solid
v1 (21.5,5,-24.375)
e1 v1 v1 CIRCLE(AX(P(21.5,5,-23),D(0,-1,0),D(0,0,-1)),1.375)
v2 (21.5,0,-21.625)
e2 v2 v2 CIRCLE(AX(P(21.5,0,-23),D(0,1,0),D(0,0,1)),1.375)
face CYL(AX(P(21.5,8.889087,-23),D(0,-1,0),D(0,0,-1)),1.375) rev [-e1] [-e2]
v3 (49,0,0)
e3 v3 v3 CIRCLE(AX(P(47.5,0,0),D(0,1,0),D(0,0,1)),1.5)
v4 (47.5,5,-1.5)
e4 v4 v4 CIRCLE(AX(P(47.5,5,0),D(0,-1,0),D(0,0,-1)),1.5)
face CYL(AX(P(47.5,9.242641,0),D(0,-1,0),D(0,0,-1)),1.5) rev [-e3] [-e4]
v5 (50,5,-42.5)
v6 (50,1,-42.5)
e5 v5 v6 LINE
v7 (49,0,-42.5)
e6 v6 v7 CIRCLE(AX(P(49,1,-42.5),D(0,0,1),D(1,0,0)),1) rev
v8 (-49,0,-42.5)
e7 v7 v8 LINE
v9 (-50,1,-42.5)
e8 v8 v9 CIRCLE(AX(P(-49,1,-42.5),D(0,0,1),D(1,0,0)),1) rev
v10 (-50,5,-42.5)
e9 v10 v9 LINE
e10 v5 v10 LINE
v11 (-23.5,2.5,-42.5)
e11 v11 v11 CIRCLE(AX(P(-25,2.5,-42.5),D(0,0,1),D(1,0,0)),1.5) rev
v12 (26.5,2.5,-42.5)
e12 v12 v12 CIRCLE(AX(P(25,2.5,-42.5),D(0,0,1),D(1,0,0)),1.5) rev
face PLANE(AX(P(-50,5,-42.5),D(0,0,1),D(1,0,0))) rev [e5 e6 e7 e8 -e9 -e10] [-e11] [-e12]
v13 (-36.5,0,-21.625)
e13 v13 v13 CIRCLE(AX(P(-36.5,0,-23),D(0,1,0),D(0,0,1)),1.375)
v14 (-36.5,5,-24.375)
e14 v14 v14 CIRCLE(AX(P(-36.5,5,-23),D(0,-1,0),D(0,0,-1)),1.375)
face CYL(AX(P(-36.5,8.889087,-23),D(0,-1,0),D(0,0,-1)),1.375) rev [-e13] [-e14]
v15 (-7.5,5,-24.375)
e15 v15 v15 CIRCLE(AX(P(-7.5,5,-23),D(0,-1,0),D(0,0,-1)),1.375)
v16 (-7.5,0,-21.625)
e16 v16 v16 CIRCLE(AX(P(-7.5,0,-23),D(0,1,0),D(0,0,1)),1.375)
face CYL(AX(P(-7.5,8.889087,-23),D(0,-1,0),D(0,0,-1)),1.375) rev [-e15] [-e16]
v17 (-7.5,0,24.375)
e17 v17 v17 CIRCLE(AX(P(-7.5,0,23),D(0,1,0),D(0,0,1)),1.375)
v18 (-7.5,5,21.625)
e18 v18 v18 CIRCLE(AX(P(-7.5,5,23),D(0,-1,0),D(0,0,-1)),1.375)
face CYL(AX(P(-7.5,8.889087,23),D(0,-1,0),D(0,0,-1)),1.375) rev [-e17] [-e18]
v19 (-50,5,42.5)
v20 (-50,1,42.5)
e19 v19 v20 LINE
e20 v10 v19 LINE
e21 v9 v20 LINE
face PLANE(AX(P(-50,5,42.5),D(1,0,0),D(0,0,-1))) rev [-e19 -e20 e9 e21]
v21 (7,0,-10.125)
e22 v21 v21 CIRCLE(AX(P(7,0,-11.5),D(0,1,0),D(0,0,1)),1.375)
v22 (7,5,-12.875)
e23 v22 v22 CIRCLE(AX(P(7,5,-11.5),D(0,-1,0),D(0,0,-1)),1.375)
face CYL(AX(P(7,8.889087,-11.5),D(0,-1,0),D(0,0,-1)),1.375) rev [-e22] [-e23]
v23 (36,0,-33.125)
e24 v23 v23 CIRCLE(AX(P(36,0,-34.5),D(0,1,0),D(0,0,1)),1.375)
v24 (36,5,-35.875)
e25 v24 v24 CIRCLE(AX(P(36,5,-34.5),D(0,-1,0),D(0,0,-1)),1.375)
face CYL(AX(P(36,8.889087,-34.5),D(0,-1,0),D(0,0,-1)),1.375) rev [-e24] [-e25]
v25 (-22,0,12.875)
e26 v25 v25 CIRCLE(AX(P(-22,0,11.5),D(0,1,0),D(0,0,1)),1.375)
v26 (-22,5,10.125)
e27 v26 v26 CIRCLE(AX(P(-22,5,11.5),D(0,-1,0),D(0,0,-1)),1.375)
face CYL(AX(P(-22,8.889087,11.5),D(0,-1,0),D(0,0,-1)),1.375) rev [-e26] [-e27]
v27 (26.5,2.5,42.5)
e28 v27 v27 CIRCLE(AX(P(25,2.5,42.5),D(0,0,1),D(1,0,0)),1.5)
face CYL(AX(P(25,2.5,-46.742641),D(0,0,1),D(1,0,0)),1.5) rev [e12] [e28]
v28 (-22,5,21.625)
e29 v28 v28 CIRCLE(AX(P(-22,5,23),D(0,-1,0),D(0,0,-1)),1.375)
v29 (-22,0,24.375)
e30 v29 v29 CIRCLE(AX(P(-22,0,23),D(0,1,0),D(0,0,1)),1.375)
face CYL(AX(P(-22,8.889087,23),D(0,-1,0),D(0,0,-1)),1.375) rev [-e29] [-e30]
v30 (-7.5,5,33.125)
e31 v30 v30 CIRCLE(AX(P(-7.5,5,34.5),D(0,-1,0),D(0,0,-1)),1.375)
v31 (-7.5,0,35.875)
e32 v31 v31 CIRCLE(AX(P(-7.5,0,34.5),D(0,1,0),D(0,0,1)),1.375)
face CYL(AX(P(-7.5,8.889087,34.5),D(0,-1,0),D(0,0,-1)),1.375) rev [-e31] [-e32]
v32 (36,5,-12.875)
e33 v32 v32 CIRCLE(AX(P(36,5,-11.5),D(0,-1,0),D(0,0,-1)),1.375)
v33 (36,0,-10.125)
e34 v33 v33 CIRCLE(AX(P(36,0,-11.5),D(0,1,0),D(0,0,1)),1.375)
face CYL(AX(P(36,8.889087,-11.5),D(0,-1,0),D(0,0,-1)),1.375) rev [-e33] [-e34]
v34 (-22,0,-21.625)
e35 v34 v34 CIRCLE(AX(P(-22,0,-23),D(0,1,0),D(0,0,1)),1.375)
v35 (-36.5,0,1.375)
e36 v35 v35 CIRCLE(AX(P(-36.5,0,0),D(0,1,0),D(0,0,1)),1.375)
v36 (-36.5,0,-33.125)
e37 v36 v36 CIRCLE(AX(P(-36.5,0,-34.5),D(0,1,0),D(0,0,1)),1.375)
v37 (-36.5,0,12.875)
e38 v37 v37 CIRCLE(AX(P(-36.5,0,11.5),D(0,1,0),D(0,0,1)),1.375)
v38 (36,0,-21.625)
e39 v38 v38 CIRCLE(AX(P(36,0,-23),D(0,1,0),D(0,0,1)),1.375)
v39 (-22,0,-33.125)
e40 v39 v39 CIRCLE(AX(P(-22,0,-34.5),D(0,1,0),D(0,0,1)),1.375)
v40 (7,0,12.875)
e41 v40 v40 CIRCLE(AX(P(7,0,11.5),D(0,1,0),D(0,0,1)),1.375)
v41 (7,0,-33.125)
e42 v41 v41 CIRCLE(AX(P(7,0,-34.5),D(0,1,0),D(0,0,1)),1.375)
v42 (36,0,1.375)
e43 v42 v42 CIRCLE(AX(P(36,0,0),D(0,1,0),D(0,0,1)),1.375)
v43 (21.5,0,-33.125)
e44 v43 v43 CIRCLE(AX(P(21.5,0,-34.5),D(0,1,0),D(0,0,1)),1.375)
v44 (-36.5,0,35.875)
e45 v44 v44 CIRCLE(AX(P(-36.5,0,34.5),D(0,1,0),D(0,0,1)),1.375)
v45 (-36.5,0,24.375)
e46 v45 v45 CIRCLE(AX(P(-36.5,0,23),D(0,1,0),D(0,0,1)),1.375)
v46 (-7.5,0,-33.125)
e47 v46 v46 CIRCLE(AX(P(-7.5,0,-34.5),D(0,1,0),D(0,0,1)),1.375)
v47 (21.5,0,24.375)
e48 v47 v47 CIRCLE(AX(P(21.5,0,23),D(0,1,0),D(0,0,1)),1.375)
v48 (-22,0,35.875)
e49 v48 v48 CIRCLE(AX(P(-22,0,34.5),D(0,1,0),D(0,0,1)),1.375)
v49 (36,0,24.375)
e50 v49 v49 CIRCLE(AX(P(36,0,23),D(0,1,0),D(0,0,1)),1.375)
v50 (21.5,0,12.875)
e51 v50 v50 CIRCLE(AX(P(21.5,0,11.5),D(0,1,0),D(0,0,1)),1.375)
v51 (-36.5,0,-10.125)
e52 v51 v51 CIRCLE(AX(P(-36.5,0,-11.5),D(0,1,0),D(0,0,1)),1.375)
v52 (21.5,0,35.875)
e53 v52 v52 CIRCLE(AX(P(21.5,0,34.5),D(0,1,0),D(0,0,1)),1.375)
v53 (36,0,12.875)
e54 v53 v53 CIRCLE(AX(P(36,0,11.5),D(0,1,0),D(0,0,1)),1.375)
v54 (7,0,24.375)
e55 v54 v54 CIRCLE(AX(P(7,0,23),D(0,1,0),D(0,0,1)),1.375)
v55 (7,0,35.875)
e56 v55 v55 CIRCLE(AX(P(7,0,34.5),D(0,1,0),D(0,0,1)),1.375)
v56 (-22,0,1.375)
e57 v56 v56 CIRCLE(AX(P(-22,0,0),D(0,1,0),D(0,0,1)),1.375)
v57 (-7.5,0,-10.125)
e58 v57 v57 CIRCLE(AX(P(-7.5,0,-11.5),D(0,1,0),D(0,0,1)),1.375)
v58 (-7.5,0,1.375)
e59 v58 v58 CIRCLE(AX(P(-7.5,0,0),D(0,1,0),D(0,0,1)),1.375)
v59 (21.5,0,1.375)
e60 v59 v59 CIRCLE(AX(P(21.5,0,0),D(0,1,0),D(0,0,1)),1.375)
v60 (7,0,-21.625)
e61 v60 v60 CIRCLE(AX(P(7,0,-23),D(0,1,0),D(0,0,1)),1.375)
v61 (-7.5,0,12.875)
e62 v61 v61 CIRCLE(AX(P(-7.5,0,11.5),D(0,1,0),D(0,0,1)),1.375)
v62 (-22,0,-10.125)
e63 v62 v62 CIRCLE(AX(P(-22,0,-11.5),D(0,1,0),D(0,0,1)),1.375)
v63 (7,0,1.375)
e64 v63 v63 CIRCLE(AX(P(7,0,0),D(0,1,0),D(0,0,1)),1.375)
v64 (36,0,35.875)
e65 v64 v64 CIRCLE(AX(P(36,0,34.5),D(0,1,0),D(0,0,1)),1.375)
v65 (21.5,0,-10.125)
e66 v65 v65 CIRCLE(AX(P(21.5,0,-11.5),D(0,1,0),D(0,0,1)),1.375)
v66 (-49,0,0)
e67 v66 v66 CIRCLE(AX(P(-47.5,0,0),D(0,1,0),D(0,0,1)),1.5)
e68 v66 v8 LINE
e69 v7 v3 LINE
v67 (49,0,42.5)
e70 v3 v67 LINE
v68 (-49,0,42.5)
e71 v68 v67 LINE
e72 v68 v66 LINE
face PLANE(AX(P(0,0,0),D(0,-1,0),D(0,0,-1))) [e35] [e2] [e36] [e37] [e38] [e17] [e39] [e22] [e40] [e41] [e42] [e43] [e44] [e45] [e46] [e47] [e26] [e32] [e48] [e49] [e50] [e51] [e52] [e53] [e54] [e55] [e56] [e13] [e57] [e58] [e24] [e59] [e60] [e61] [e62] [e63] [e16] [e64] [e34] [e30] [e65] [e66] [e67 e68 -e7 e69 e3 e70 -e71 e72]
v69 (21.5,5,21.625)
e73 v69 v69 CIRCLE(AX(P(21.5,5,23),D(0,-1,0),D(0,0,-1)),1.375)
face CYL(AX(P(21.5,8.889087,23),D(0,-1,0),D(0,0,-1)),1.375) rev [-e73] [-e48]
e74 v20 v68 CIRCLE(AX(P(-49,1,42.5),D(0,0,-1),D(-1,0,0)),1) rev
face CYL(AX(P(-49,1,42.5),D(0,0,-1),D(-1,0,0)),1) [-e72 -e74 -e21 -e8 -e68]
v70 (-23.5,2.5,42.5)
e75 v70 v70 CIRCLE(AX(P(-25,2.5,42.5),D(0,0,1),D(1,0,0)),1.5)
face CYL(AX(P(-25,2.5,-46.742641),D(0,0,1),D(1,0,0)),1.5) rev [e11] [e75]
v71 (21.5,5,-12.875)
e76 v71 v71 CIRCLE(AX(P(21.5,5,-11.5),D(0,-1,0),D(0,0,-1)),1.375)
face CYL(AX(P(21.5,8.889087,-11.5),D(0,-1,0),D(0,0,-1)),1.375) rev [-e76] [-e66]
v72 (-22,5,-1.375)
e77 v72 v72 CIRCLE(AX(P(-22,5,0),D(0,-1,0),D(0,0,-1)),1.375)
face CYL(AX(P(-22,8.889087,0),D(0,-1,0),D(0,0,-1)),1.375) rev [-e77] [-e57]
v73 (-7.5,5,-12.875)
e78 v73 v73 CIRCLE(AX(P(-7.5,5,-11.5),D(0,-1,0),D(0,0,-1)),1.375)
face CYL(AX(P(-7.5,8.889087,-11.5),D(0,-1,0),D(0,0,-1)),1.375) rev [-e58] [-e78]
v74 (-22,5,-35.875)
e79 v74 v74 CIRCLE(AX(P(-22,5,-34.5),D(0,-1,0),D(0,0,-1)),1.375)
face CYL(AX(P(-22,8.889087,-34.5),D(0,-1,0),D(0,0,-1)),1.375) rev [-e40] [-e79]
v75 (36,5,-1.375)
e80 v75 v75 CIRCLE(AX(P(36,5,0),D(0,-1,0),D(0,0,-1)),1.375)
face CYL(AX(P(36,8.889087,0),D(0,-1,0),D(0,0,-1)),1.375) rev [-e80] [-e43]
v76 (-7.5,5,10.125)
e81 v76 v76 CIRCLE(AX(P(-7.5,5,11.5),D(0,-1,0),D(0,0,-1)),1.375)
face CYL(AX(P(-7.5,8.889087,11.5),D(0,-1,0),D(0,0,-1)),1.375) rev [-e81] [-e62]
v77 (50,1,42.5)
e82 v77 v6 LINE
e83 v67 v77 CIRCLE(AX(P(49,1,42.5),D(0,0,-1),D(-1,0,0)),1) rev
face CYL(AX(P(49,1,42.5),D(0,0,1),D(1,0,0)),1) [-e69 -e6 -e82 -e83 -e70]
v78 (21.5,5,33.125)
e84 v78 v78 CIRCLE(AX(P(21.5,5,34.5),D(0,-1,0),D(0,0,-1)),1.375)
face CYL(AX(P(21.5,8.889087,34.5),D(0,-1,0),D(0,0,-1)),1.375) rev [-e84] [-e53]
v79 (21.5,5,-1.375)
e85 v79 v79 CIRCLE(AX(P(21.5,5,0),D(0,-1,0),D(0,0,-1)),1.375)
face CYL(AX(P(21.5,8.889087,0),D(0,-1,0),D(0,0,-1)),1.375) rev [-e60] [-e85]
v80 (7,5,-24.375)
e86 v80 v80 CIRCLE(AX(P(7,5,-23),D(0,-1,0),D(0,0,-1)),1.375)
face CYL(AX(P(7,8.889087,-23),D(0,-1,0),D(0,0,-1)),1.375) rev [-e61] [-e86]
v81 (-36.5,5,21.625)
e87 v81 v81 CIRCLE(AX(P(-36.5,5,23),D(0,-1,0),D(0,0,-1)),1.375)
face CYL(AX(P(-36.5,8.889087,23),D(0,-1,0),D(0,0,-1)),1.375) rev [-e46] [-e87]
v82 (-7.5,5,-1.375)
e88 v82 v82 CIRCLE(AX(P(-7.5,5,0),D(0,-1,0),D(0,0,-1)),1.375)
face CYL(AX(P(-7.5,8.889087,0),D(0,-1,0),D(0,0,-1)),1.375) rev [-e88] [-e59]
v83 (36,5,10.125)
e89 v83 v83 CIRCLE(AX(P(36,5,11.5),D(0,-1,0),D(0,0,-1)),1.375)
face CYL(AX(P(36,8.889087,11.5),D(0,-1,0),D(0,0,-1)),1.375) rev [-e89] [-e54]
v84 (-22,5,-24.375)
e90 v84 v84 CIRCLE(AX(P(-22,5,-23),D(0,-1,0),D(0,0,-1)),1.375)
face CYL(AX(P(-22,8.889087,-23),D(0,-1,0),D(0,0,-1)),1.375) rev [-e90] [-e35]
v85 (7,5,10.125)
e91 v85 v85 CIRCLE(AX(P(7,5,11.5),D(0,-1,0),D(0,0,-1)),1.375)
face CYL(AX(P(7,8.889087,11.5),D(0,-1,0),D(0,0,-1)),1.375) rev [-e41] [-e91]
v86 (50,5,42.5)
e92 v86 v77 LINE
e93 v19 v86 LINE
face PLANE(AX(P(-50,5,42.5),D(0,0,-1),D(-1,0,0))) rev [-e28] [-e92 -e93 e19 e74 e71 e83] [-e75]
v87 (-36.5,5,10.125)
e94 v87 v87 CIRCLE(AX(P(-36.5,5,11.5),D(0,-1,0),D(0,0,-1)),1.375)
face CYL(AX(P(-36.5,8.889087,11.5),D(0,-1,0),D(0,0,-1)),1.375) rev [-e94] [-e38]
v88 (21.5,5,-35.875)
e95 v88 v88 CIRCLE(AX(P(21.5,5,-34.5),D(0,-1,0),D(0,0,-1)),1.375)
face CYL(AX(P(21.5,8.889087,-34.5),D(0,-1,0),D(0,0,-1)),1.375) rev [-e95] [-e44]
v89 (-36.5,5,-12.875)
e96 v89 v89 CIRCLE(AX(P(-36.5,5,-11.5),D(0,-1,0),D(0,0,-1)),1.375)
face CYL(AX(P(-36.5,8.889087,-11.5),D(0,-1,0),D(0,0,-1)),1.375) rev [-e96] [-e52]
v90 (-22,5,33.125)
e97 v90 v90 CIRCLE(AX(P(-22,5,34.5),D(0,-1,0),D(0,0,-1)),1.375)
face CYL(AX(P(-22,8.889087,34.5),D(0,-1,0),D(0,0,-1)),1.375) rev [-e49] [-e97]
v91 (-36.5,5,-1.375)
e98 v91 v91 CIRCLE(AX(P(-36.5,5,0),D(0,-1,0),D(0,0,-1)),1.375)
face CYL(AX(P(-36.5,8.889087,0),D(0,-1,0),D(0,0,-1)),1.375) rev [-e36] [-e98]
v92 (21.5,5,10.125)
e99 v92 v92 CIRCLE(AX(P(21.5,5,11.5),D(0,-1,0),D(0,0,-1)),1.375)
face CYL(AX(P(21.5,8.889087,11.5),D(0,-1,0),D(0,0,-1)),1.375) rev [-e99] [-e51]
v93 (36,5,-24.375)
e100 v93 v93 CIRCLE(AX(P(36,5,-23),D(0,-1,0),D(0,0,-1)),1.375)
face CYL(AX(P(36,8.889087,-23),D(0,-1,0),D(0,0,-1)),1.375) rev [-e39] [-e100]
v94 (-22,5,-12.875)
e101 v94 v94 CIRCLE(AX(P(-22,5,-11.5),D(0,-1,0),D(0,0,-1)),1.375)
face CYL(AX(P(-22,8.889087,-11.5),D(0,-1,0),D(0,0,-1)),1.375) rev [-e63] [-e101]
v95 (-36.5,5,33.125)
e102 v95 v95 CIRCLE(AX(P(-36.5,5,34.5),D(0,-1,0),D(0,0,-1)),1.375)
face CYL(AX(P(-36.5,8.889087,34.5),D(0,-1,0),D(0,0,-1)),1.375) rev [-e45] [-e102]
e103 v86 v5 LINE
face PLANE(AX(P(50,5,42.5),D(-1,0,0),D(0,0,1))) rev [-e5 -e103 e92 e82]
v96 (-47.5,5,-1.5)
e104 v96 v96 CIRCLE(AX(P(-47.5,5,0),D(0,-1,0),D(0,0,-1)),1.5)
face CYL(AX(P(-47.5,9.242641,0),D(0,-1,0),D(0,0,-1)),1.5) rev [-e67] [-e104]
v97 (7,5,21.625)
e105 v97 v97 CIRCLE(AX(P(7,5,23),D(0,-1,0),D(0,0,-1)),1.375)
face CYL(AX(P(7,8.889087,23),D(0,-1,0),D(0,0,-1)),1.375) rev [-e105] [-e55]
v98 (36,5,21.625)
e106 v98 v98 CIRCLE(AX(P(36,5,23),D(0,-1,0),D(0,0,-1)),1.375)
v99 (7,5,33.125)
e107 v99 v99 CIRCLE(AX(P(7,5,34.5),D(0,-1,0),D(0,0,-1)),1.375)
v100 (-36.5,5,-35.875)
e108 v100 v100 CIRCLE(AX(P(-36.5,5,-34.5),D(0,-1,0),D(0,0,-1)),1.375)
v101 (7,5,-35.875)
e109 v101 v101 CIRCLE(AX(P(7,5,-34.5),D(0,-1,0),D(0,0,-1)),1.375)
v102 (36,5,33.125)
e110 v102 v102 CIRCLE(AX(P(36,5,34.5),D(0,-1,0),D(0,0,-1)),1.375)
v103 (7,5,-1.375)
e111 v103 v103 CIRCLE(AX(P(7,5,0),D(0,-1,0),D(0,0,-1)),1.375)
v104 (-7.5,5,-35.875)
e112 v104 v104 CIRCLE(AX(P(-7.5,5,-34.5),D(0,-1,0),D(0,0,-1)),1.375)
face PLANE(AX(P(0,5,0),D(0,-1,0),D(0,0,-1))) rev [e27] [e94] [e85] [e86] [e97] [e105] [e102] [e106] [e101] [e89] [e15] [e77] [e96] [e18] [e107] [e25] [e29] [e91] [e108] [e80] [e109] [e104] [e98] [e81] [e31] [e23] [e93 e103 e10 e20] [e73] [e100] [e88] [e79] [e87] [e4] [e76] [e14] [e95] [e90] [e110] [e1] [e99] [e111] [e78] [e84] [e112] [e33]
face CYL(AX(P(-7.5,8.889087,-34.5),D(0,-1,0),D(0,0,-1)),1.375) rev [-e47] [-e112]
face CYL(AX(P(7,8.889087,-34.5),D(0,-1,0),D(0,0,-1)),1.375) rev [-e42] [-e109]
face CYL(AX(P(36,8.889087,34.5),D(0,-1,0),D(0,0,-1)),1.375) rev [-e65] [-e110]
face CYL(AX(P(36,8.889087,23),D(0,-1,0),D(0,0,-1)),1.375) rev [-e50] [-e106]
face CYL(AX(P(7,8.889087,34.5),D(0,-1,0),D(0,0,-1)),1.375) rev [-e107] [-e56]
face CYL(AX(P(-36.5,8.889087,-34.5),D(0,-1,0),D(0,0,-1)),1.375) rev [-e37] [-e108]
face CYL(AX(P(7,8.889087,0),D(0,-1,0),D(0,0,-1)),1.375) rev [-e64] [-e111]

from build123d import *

# Parameters (mm, degrees)
ESQUISSE1_W                     = 100
ESQUISSE1_H                     = 85
BOSS_EXTRU_1_DEPTH              = 5
ESQUISSE2_R                     = 1.5
ENL_V_MAT_EXTRU_1_DEPTH         = 85
ESQUISSE3_R                     = 1.375
ENL_V_MAT_EXTRU_2_DEPTH         = 5
R_P_TITION_LIN_AIRE1_COUNT      = 7
R_P_TITION_LIN_AIRE1_PITCH      = 11.5
R_P_TITION_LIN_AIRE1_COUNT_DIR2 = 6
R_P_TITION_LIN_AIRE1_PITCH_DIR2 = 14.5
ESQUISSE4_R                     = 1.5
ENL_V_MAT_EXTRU_3_DEPTH         = 5
CONG_1_R                        = 1


with BuildPart() as part:
    # Esquisse1 → Boss.-Extru.1 (new body)
    with BuildSketch(Plane(origin=(0, 0, 0), x_dir=(1, 0, 0), z_dir=(0, 1, 0))):
        Rectangle(ESQUISSE1_W, ESQUISSE1_H)
    extrude(amount=BOSS_EXTRU_1_DEPTH)

    # Esquisse2 → Enlèv. mat.-Extru.1 (cut)
    with BuildSketch(Plane.XY.offset(42.5)):
        with Locations((-25, 2.5)):
            Circle(ESQUISSE2_R)
        with Locations((25, 2.5)):
            Circle(ESQUISSE2_R)
    extrude(amount=-ENL_V_MAT_EXTRU_1_DEPTH, mode=Mode.SUBTRACT)

    # Esquisse3 → Enlèv. mat.-Extru.2 (cut)
    with BuildSketch(Plane(origin=(0, 0, 0), x_dir=(1, 0, 0), z_dir=(0, 1, 0))):
        with Locations(Location((-36.5, 34.5, 0), (0, 0, 90))):
            Circle(ESQUISSE3_R)
    enl_v_mat_extru_2 = extrude(amount=ENL_V_MAT_EXTRU_2_DEPTH, mode=Mode.SUBTRACT)

    # Répétition linéaire1: Enl_v. mat.-Extru.2 7 × 6
    with Locations(*[(j * R_P_TITION_LIN_AIRE1_PITCH_DIR2, 0, i * R_P_TITION_LIN_AIRE1_PITCH) for i in range(R_P_TITION_LIN_AIRE1_COUNT) for j in range(R_P_TITION_LIN_AIRE1_COUNT_DIR2) if (i, j) != (0, 0)]):
        add(enl_v_mat_extru_2, mode=Mode.SUBTRACT)

    # Esquisse4 → Enlèv. mat.-Extru.3 (cut)
    with BuildSketch(Plane(origin=(0, 0, 0), x_dir=(1, 0, 0), z_dir=(0, 1, 0))):
        with Locations(Location((-47.5, 0, 0), (0, 0, 90))):
            Circle(ESQUISSE4_R)
        with Locations(Location((47.5, 0, 0), (0, 0, 90))):
            Circle(ESQUISSE4_R)
    extrude(amount=ENL_V_MAT_EXTRU_3_DEPTH, mode=Mode.SUBTRACT)

    # Congé1
    cong_1_edges = [part.edges().sort_by_distance(p)[0] for p in [
        (-50, 0, 0),
        (50, 0, 0),
    ]]
    fillet(cong_1_edges, radius=CONG_1_R - 0.0001)  # a hair under: the kernel refuses the full size


solid = part.part
